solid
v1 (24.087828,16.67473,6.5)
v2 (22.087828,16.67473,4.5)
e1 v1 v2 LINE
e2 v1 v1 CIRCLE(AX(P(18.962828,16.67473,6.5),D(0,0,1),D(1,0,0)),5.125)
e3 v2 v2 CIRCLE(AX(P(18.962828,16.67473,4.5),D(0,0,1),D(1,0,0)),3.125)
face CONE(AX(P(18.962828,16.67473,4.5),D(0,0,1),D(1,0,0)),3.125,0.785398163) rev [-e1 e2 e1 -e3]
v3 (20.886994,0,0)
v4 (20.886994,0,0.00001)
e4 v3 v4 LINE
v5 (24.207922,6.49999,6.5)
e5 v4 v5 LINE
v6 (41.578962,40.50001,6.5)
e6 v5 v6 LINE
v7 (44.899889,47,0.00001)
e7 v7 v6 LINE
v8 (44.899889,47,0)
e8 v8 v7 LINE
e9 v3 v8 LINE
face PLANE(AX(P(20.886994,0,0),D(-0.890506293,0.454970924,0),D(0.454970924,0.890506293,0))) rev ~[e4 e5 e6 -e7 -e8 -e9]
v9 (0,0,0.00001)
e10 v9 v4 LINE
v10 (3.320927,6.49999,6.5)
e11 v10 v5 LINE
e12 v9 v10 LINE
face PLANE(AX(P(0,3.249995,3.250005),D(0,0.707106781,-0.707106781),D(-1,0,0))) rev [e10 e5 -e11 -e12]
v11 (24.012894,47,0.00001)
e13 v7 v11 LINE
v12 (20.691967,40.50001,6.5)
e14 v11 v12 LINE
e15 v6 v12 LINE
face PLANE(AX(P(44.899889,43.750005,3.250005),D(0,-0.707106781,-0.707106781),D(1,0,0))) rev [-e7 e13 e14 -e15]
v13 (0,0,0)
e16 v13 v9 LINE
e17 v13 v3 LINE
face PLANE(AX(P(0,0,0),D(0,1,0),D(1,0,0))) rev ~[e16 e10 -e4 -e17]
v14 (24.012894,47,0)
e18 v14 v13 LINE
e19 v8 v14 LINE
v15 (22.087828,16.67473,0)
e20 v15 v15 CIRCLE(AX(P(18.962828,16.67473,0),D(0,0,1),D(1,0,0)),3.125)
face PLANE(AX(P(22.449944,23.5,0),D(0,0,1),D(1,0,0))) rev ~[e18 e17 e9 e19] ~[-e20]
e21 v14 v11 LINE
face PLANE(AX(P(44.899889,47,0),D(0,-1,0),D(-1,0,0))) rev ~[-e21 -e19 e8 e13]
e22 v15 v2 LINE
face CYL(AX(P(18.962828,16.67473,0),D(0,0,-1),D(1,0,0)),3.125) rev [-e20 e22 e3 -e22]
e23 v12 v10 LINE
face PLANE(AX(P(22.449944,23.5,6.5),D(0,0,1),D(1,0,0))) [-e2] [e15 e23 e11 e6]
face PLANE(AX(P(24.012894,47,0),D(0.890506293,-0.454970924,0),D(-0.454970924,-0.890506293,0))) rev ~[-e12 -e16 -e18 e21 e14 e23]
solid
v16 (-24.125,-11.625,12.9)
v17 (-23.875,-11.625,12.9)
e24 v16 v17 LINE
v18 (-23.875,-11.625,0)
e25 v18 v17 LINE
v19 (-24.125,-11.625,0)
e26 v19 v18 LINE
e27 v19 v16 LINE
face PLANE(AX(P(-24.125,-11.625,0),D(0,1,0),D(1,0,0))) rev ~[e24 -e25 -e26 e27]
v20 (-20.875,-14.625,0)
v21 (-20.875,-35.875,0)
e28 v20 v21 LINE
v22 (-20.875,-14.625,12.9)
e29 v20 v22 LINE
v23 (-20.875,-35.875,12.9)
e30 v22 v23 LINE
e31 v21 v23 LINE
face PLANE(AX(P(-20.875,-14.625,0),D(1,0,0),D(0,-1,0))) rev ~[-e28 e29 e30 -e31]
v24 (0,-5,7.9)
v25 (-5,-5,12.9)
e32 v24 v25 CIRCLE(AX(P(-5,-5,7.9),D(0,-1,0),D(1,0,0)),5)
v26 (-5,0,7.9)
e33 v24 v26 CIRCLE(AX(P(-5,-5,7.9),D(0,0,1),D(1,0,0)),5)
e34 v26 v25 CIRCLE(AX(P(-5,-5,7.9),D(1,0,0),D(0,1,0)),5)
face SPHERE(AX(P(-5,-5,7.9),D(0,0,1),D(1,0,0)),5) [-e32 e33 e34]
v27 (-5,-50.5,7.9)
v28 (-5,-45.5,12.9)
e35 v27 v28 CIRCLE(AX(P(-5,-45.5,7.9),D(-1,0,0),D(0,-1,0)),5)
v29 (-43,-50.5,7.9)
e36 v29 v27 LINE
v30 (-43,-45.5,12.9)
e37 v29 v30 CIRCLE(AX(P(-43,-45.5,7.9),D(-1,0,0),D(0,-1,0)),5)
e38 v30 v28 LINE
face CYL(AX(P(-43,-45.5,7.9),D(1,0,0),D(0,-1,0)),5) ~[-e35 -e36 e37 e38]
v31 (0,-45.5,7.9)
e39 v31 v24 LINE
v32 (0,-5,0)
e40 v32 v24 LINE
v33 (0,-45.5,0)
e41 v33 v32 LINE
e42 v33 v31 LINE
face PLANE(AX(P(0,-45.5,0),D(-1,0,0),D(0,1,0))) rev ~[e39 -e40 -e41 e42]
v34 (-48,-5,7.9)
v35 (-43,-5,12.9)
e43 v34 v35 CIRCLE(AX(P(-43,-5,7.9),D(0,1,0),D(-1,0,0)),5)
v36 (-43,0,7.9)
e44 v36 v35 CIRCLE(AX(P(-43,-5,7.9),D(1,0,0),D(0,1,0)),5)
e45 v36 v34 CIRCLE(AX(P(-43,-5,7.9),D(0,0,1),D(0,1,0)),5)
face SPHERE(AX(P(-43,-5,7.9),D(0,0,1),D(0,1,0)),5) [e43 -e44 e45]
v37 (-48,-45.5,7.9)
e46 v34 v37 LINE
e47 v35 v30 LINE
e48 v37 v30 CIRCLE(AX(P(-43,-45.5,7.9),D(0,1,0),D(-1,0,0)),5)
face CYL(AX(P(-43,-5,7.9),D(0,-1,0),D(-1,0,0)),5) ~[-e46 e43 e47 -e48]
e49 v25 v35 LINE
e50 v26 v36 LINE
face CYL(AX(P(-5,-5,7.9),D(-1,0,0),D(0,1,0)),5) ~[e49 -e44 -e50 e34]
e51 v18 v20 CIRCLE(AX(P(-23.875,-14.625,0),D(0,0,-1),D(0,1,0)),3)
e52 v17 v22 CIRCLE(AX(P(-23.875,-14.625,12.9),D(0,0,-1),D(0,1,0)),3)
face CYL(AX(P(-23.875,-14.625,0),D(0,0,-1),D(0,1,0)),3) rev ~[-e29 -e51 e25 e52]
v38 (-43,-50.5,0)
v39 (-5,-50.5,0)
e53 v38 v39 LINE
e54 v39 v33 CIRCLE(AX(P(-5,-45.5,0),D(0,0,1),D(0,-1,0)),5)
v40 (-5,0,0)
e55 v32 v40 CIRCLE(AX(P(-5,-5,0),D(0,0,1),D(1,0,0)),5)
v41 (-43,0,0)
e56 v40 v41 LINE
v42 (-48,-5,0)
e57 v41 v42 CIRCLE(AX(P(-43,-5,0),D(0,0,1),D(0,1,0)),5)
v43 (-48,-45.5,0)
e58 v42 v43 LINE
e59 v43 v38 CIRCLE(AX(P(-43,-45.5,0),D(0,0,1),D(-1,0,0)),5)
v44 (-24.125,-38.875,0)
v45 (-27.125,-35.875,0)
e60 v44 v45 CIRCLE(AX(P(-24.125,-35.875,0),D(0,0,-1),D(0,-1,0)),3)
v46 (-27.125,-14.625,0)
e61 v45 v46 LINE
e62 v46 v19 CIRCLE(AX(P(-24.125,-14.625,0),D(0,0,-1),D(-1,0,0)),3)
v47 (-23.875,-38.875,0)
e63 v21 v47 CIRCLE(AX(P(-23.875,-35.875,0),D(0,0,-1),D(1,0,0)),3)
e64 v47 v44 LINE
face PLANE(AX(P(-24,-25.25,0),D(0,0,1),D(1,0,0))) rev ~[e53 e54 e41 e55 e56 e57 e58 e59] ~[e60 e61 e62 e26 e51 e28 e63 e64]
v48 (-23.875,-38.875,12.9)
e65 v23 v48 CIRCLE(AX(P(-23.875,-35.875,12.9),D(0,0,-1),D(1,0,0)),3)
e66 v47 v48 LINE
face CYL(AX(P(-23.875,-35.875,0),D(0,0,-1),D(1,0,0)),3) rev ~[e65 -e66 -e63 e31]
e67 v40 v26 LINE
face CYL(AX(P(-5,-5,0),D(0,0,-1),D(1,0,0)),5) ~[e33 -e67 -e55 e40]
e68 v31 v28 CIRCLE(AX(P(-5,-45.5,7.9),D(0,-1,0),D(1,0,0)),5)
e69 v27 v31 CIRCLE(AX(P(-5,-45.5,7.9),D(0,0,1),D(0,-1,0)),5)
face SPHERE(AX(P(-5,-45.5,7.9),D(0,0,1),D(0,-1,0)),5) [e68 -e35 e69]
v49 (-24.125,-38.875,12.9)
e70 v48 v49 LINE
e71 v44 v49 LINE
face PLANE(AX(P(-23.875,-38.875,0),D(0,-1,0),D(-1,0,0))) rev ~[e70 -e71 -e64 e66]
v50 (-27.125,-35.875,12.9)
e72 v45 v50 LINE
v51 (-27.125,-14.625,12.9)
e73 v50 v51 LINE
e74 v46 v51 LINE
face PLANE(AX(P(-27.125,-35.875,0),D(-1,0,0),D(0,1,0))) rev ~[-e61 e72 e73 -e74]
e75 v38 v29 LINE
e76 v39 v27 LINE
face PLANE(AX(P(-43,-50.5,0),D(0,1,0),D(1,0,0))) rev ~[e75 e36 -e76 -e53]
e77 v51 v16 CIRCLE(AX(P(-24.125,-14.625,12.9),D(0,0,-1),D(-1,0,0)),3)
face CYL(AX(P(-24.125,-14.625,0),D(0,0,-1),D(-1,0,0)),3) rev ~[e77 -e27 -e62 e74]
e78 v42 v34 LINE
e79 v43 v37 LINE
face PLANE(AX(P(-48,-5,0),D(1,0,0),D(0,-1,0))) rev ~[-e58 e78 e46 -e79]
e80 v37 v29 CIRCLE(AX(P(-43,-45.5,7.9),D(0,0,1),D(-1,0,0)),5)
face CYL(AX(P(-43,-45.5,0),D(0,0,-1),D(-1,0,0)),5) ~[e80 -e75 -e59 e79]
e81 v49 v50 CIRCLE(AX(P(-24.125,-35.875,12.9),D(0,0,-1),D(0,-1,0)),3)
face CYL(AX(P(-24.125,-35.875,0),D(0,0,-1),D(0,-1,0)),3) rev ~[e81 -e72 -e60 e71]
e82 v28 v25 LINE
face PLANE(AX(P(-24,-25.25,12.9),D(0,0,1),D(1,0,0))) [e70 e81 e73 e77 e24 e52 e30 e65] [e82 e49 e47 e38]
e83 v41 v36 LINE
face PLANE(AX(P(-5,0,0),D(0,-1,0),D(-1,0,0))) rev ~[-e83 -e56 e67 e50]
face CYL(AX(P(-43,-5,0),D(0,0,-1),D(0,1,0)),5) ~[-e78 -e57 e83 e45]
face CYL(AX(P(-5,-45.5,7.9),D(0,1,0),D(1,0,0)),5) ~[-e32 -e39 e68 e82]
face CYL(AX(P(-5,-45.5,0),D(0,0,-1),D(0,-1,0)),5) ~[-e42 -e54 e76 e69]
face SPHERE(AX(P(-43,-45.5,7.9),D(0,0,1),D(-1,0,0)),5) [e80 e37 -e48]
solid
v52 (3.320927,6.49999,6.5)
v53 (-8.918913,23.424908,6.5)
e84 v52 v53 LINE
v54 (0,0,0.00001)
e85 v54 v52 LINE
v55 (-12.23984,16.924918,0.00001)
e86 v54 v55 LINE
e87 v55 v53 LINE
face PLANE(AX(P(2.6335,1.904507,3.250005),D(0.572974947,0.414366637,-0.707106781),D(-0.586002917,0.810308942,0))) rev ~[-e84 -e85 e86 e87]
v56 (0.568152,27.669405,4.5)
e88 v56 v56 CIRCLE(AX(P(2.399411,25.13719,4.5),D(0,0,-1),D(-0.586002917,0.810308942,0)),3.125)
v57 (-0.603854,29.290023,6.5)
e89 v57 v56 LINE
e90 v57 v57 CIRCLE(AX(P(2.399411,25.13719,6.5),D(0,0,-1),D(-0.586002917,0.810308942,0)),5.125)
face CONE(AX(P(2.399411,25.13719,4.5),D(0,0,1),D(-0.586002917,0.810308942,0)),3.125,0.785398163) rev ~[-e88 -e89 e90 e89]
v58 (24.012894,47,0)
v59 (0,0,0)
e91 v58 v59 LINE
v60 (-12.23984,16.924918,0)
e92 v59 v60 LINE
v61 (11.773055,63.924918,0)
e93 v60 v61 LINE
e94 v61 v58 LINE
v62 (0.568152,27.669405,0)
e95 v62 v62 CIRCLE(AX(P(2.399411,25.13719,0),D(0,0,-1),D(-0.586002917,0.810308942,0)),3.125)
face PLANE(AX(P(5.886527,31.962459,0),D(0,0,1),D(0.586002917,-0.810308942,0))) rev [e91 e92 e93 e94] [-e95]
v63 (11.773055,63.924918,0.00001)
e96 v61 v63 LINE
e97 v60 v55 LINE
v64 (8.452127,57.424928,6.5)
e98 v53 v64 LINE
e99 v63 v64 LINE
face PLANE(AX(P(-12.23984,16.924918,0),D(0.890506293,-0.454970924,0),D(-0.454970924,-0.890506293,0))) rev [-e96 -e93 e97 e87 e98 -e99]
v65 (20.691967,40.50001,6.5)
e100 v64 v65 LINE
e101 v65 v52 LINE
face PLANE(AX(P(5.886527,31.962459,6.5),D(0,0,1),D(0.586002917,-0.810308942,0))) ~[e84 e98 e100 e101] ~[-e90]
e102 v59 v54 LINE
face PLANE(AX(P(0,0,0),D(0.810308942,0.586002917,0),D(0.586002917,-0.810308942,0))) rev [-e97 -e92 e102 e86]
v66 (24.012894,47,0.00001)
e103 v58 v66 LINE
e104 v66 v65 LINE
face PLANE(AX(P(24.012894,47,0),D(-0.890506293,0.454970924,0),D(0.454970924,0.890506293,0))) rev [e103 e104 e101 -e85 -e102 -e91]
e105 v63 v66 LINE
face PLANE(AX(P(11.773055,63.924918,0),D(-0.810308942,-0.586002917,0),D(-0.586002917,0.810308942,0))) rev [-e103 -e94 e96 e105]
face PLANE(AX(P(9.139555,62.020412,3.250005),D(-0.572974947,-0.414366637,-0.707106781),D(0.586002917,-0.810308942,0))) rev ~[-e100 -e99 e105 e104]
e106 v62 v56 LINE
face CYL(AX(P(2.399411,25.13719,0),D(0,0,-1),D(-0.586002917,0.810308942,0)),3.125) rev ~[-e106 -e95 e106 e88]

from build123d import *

# Parameters (mm, degrees)
F1_DEPTH = 12.9
F2_R     = 5
F3_R     = 3.125
F4_DEPTH = 6.5
F5_SIZE  = 6.49999
F6_SIZE  = 2


# Not quite as in the source:
# - a fillet or chamfer is up to 0.001 mm smaller than in the source, because OpenCascade refuses the exact size


with BuildPart() as f1:
    # F0 (on Top) → F1 (new body)
    with BuildSketch(Plane.XY):
        with BuildLine():
            ThreePointArc((-48, -45.5), (-46.5355339059, -49.0355339059), (-43, -50.5))
            Line((-43, -50.5), (-5, -50.5))
            ThreePointArc((-5, -50.5), (-1.4644660941, -49.0355339059), (0, -45.5))
            Line((0, -45.5), (0, -5))
            ThreePointArc((0, -5), (-1.4644660941, -1.4644660941), (-5, 0))
            Line((-5, 0), (-43, 0))
            ThreePointArc((-43, 0), (-46.5355339059, -1.4644660941), (-48, -5))
            Line((-48, -5), (-48, -45.5))
        make_face()
        with BuildLine():
            ThreePointArc((-27.125, -14.625), (-26.2463203436, -12.5036796564), (-24.125, -11.625))
            Line((-24.125, -11.625), (-23.875, -11.625))
            ThreePointArc((-23.875, -11.625), (-21.7536796564, -12.5036796564), (-20.875, -14.625))
            Line((-20.875, -14.625), (-20.875, -35.875))
            ThreePointArc((-20.875, -35.875), (-21.7536796564, -37.9963203436), (-23.875, -38.875))
            Line((-23.875, -38.875), (-24.125, -38.875))
            ThreePointArc((-24.125, -38.875), (-26.2463203436, -37.9963203436), (-27.125, -35.875))
            Line((-27.125, -35.875), (-27.125, -14.625))
        make_face(mode=Mode.SUBTRACT)
    extrude(amount=F1_DEPTH)

    # F2
    f2_edges = [f1.edges().sort_by_distance(p)[0] for p in [
        (0, -25.25, 12.9),
        (-1.464466, -49.035534, 12.9),
        (-24, -50.5, 12.9),
        (-46.535534, -49.035534, 12.9),
        (-48, -25.25, 12.9),
        (-46.535534, -1.464466, 12.9),
        (-24, 0, 12.9),
        (-1.464466, -1.464466, 12.9),
    ]]
    fillet(f2_edges, radius=F2_R)


with BuildPart() as f4:
    # F3 (on Top) → F4 (new body)
    with BuildSketch(Plane.XY):
        Polygon((24.0128942012, 47), (0, 0), (20.8869944401, 0), (44.8998886413, 47), align=None)
        with Locations((18.9628277648, 16.6747303447)):
            Circle(F3_R, mode=Mode.SUBTRACT)
    extrude(amount=F4_DEPTH)

    # F5 (size 6.5 in the source; OpenCascade refuses exactly that, so slightly less here)
    f5_edges = [f4.edges().sort_by_distance(p)[0] for p in [
        (10.443497, 0, 6.5),
        (34.456391, 47, 6.5),
    ]]
    chamfer(f5_edges, length=F5_SIZE)

    # F6
    f6_edges = [f4.edges().sort_by_distance(p)[0] for p in [
        (15.837828, 16.67473, 6.5),
    ]]
    chamfer(f6_edges, length=F6_SIZE)


with BuildPart() as f7_1:
    # F7: instance of F4
    add(f4.part.mirror(Plane(origin=(12.0064471006, 23.5, 3.0761317731), x_dir=(-0.4549709236, -0.8905062934, 0), z_dir=(-0.8905062934, 0.4549709236, 0))))


solid = Compound([f1.part, f4.part, f7_1.part])
